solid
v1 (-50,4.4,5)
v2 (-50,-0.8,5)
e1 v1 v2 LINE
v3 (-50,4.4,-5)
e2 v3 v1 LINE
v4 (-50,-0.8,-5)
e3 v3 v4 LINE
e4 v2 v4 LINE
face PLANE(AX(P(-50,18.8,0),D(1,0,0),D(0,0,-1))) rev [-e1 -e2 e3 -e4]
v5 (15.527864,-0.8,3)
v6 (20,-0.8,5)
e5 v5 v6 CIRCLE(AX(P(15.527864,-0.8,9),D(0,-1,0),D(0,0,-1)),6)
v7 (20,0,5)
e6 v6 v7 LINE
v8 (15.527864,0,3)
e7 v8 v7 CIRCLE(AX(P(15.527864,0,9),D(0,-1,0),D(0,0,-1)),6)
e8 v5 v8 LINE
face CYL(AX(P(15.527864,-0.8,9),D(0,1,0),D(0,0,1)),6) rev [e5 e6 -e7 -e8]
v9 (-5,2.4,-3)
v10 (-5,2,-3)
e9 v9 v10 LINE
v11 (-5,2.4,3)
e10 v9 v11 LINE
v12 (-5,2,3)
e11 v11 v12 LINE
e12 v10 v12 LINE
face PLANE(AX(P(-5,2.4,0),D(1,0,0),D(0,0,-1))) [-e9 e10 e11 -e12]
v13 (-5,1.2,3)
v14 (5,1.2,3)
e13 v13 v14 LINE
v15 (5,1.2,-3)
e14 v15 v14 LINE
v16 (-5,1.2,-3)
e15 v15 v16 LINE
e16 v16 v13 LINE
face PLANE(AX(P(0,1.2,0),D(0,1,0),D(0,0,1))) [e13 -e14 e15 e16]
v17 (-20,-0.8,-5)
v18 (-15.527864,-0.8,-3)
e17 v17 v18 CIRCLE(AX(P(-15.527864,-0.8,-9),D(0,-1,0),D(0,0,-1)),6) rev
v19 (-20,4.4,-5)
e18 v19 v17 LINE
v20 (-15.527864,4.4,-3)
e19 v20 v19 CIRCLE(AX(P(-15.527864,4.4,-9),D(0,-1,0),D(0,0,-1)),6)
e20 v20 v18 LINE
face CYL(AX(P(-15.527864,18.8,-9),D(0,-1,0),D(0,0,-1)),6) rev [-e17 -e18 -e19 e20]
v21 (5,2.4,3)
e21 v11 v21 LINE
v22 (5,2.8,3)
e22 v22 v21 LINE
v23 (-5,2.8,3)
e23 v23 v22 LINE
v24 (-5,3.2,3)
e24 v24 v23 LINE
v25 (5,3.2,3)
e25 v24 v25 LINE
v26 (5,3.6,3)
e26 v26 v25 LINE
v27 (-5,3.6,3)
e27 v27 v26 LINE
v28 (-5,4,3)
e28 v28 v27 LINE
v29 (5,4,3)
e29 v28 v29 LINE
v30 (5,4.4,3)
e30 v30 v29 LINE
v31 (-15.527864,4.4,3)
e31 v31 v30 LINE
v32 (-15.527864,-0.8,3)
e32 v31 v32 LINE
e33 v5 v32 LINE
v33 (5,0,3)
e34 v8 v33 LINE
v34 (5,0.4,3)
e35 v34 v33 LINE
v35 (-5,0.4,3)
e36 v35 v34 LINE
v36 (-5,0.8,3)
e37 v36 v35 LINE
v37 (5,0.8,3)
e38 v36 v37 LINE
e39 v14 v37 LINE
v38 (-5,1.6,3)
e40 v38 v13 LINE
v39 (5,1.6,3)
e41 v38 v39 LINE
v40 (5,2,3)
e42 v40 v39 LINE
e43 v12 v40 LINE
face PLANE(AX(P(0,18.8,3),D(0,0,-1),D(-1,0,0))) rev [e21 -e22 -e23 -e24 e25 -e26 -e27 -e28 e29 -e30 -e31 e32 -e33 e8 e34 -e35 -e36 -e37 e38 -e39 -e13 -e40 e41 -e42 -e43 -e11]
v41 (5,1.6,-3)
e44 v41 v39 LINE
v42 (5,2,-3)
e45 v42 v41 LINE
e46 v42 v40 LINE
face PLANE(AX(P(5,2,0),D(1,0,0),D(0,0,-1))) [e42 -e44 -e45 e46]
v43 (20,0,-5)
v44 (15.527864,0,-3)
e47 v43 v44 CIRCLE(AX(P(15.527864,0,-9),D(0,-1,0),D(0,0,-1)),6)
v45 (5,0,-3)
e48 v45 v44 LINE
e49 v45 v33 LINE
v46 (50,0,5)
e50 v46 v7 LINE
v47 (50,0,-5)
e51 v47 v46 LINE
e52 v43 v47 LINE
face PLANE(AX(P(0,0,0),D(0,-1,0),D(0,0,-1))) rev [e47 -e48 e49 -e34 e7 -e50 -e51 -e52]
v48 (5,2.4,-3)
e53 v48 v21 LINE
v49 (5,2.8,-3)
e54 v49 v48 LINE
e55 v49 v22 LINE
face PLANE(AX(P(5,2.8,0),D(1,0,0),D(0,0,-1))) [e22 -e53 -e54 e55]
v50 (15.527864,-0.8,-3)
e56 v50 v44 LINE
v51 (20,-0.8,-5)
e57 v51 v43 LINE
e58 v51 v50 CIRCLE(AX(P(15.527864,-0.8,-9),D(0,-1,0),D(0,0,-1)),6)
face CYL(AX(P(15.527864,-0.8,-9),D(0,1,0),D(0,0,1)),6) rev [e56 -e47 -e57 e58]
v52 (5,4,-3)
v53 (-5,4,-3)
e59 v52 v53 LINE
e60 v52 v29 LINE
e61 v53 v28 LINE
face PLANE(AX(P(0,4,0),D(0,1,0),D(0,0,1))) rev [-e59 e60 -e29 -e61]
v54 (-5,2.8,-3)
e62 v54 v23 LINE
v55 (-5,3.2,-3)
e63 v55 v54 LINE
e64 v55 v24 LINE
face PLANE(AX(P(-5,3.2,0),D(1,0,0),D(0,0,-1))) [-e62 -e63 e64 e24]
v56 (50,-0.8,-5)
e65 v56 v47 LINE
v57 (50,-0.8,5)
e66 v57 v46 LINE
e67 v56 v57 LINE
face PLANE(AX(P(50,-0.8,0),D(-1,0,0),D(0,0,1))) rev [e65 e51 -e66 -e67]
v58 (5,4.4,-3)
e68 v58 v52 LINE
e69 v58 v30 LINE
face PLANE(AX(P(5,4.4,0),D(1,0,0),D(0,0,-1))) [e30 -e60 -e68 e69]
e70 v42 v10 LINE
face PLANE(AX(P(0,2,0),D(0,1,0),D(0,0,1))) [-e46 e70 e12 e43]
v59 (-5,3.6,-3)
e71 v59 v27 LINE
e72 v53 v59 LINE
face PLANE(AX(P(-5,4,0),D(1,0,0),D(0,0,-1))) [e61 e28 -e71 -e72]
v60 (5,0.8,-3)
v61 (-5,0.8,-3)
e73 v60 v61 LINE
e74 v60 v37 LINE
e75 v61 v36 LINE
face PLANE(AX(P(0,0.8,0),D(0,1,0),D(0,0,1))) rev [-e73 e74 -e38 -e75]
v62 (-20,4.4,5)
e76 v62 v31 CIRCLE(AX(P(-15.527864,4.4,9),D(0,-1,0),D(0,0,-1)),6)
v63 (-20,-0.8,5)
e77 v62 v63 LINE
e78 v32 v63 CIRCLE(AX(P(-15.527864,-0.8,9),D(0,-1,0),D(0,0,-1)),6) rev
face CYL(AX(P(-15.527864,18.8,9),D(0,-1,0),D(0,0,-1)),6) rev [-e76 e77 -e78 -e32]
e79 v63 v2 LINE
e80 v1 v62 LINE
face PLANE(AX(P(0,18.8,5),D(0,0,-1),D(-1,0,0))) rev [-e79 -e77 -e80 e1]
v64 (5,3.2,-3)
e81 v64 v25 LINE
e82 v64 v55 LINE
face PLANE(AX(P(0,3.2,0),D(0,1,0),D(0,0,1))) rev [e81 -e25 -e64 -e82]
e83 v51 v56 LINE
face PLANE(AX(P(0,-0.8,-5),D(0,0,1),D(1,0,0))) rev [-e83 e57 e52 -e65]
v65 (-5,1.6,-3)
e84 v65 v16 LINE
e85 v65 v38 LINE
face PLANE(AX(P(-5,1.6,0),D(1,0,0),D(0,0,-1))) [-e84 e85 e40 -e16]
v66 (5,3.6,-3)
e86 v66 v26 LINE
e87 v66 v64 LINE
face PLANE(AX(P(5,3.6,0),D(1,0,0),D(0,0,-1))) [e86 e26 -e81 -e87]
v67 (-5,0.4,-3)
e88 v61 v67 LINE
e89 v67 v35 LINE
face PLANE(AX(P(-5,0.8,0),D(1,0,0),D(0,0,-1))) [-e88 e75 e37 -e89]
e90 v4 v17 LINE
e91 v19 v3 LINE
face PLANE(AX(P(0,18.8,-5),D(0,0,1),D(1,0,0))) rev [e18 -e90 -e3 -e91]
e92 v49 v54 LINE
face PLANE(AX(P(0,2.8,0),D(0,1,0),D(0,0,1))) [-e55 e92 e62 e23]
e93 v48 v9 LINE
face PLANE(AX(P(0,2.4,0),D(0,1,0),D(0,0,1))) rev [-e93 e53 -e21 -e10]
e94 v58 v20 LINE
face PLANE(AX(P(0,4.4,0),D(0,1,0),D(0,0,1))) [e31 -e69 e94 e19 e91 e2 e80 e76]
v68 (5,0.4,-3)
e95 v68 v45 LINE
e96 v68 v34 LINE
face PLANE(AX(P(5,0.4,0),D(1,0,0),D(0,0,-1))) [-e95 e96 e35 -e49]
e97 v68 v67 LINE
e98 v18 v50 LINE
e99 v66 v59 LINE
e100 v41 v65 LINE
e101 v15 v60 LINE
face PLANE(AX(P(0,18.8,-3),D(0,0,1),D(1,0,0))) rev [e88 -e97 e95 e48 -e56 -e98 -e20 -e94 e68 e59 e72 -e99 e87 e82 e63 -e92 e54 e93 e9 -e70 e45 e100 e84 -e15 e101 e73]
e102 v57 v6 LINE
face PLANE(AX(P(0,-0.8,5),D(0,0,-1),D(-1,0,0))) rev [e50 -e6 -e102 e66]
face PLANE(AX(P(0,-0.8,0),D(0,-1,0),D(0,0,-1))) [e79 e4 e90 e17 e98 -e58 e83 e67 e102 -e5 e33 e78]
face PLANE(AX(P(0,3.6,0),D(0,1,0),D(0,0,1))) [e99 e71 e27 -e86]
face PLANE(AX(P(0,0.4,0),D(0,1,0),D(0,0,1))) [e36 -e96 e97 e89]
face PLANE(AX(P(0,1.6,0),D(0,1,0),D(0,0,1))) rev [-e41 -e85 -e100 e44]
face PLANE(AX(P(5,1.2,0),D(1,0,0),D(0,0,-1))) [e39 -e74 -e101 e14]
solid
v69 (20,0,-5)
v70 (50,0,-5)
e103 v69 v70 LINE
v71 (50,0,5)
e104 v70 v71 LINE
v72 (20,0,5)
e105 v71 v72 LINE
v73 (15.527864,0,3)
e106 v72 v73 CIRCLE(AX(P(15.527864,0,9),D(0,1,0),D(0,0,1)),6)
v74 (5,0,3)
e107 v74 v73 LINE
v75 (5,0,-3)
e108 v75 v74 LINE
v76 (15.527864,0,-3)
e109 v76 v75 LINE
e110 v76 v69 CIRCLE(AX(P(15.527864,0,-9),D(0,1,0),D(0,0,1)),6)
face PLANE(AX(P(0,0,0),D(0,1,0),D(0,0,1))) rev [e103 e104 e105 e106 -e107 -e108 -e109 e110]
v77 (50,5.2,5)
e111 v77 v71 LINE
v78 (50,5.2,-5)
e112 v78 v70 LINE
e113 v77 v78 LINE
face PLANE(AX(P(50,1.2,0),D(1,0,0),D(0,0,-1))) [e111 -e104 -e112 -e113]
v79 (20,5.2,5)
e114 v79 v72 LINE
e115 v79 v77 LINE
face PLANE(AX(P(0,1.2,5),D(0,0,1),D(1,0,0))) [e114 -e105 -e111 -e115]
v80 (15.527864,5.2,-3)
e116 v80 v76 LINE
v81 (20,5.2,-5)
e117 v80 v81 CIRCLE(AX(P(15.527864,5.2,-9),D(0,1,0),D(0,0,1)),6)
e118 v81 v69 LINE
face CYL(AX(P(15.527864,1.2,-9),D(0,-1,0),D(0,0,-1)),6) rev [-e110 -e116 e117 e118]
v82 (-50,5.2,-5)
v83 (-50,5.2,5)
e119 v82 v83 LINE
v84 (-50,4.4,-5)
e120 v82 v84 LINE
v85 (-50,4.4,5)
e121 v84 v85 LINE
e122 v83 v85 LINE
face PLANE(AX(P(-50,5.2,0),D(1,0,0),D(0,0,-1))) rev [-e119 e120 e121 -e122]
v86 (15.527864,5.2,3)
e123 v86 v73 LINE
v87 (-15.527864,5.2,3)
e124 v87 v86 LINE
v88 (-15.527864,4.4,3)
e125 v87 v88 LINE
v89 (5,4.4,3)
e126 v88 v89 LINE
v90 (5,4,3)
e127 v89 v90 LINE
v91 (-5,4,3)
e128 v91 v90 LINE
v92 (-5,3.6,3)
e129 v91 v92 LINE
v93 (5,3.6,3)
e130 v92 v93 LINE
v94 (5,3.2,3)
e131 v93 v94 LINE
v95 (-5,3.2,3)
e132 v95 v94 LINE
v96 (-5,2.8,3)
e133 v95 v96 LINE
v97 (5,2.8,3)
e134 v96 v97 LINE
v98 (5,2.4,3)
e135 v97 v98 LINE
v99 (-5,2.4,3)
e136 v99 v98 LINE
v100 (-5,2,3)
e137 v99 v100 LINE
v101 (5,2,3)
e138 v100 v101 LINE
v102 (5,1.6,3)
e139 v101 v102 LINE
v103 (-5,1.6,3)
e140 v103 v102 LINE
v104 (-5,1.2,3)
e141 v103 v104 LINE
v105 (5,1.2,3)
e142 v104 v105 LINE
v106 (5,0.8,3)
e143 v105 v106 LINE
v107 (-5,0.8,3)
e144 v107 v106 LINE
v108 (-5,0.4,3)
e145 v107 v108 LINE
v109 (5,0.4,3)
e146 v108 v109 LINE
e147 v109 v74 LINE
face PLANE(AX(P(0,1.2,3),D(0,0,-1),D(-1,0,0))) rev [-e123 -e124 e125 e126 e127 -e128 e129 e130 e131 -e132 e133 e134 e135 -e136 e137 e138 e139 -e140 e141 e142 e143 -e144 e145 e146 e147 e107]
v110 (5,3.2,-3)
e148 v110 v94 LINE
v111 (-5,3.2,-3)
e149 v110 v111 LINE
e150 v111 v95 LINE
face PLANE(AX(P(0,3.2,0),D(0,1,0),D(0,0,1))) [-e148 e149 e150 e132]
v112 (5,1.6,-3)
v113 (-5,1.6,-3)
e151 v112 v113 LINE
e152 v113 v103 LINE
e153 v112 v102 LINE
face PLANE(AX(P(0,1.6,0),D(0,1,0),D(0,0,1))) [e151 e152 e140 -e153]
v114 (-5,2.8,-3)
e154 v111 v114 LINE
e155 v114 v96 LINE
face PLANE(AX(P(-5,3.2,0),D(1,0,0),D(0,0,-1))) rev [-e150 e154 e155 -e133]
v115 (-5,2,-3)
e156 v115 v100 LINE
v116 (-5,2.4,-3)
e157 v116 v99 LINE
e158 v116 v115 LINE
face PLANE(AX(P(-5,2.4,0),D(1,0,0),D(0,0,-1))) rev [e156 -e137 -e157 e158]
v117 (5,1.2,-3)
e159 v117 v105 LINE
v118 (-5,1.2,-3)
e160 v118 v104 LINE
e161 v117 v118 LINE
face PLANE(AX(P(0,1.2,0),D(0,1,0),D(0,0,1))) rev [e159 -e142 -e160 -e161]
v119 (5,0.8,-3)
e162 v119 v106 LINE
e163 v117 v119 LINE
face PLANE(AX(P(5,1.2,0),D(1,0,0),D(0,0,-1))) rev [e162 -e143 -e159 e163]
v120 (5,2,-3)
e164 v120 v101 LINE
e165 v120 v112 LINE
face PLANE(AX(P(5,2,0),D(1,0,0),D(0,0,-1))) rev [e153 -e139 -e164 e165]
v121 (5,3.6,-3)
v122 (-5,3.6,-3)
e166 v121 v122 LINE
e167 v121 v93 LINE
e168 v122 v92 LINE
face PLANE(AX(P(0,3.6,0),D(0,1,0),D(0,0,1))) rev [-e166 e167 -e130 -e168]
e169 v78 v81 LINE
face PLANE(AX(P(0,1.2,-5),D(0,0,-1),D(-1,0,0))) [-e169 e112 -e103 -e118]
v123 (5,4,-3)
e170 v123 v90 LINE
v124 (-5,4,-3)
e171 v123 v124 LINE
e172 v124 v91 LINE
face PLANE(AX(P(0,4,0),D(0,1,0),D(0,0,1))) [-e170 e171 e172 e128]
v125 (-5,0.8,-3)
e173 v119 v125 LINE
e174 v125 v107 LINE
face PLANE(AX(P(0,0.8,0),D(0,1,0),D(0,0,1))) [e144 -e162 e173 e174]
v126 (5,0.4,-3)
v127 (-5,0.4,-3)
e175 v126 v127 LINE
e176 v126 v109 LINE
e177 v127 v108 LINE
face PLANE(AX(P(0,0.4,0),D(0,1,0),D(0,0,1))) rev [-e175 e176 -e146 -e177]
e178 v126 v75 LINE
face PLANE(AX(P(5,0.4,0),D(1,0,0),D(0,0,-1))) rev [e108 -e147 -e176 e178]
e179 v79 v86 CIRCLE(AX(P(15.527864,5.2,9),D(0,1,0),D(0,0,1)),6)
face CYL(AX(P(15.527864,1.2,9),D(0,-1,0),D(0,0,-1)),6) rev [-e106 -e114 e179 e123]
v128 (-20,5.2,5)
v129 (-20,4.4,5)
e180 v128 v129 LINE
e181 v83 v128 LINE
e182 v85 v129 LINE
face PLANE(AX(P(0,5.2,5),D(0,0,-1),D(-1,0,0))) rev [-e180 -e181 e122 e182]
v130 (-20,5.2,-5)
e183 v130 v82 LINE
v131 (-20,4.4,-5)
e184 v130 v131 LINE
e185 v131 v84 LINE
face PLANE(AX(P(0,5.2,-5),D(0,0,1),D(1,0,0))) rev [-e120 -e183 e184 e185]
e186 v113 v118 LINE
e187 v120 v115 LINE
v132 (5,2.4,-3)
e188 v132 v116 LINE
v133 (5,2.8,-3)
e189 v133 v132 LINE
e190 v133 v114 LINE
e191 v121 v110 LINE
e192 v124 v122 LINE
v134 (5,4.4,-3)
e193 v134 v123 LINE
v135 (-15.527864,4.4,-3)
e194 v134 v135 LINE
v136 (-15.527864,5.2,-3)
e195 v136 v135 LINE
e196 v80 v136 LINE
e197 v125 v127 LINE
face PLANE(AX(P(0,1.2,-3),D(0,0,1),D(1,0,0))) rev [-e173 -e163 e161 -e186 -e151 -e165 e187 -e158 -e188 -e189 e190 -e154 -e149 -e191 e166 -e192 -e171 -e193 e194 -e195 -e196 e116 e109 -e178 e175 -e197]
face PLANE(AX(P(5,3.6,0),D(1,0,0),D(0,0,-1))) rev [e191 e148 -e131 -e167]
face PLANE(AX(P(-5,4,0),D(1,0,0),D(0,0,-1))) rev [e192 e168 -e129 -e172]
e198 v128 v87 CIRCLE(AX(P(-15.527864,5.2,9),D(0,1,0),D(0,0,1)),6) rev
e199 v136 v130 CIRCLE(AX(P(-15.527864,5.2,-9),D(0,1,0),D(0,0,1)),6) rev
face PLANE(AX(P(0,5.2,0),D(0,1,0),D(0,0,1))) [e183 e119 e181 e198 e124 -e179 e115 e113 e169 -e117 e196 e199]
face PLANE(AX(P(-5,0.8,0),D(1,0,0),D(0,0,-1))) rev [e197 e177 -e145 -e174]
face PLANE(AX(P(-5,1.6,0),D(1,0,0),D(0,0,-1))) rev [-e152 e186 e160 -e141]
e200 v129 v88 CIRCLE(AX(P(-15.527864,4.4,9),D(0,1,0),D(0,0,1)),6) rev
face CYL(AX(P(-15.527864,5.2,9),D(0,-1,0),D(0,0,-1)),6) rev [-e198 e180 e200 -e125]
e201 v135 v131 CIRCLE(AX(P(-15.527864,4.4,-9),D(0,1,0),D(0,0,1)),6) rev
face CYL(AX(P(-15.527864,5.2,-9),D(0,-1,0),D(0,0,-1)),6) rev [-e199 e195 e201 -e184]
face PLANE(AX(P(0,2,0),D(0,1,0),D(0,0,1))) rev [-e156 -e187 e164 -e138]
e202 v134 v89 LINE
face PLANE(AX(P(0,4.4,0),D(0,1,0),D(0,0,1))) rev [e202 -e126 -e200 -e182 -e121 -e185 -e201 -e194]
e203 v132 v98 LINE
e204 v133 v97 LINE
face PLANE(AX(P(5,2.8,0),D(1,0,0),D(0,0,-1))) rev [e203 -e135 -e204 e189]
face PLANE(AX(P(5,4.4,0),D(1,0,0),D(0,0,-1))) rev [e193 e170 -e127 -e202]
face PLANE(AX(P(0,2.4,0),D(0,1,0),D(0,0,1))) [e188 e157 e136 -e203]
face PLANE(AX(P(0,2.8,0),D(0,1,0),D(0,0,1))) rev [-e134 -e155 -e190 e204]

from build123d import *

# Parameters (mm, degrees)
SKETCH1_W            = 5
SKETCH1_H            = 6
BOSS_EXTRUDE7_DEPTH  = 0.4
BOSS_EXTRUDE8_DEPTH  = 0.4
SKETCH4_W            = 5
SKETCH4_H            = 6
BOSS_EXTRUDE9_DEPTH  = 0.4
BOSS_EXTRUDE10_DEPTH = 0.4
LPATTERN2_COUNT      = 25
LPATTERN2_PITCH      = 0.8
LPATTERN3_COUNT      = 25
LPATTERN3_PITCH      = 0.8
BOSS_EXTRUDE11_DEPTH = 0.8
CUT_EXTRUDE1_DEPTH   = 15.6
BOSS_EXTRUDE12_DEPTH = 0.8


with BuildPart() as part:
    # Sketch1 → Boss-Extrude7 (new body)
    with BuildSketch(Plane(origin=(0, 0, 0), x_dir=(1, 0, 0), z_dir=(0, 1, 0))):
        with BuildLine():
            Line((-5, -3), (-5, 3))
            Line((-5, 3), (-15.527864045, 3))
            ThreePointArc((-15.527864045, 3), (-17.977353788, 3.522774425), (-20, 5))
            Line((-20, 5), (-50, 5))
            Line((-50, 5), (-50, -5))
            Line((-50, -5), (-20, -5))
            ThreePointArc((-20, -5), (-17.977353788, -3.522774425), (-15.527864045, -3))
            Line((-15.527864045, -3), (-5, -3))
        make_face()
        with Locations((-2.5, 0)):
            Rectangle(SKETCH1_W, SKETCH1_H)
        with Locations((2.5, 0)):
            Rectangle(SKETCH1_W, SKETCH1_H)
    extrude(amount=BOSS_EXTRUDE7_DEPTH)

    # Sketch4<3> → Boss-Extrude10 (add)
    with BuildSketch(Plane(origin=(0, 0.4, 0), x_dir=(1, 0, 0), z_dir=(0, 1, 0))):
        with BuildLine():
            Line((-5, -3), (-5, 3))
            Line((-5, 3), (-15.527864045, 3))
            ThreePointArc((-15.527864045, 3), (-17.977353788, 3.522774425), (-20, 5))
            Line((-20, 5), (-50, 5))
            Line((-50, 5), (-50, -5))
            Line((-50, -5), (-20, -5))
            ThreePointArc((-20, -5), (-17.977353788, -3.522774425), (-15.527864045, -3))
            Line((-15.527864045, -3), (-5, -3))
        make_face()
    extrude(amount=BOSS_EXTRUDE10_DEPTH)


with BuildPart() as body_2:
    # Sketch1<3> → Boss-Extrude8 (new body)
    with BuildSketch(Plane(origin=(0, 0, 0), x_dir=(1, 0, 0), z_dir=(0, 1, 0))):
        with BuildLine():
            ThreePointArc((20, 5), (17.977353788, 3.522774425), (15.527864045, 3))
            Line((15.527864045, 3), (5, 3))
            Line((5, 3), (5, -3))
            Line((5, -3), (15.527864045, -3))
            ThreePointArc((15.527864045, -3), (17.977353788, -3.522774425), (20, -5))
            Line((20, -5), (50, -5))
            Line((50, -5), (50, 5))
            Line((50, 5), (20, 5))
        make_face()
    extrude(amount=BOSS_EXTRUDE8_DEPTH)

    # Sketch4 → Boss-Extrude9 (add)
    with BuildSketch(Plane(origin=(0, 0.4, 0), x_dir=(1, 0, 0), z_dir=(0, 1, 0))):
        with BuildLine():
            ThreePointArc((20, -5), (17.977353788, -3.522774425), (15.527864045, -3))
            Line((15.527864045, -3), (5, -3))
            Line((5, -3), (5, 3))
            Line((5, 3), (15.527864045, 3))
            ThreePointArc((15.527864045, 3), (17.977353788, 3.522774425), (20, 5))
            Line((20, 5), (50, 5))
            Line((50, 5), (50, -5))
            Line((50, -5), (20, -5))
        make_face()
        with Locations((2.5, 0)):
            Rectangle(SKETCH4_W, SKETCH4_H)
        with Locations((-2.5, 0)):
            Rectangle(SKETCH4_W, SKETCH4_H)
    extrude(amount=BOSS_EXTRUDE9_DEPTH)


with BuildPart() as lpattern2_1:
    # LPattern2: pattern copy
    add(part.part.moved(Location(Vector(0, 1, 0) * (1 * LPATTERN2_PITCH))))


with BuildPart() as lpattern2_2:
    # LPattern2: pattern copy
    add(part.part.moved(Location(Vector(0, 1, 0) * (2 * LPATTERN2_PITCH))))


with BuildPart() as lpattern2_3:
    # LPattern2: pattern copy
    add(part.part.moved(Location(Vector(0, 1, 0) * (3 * LPATTERN2_PITCH))))


with BuildPart() as lpattern2_4:
    # LPattern2: pattern copy
    add(part.part.moved(Location(Vector(0, 1, 0) * (4 * LPATTERN2_PITCH))))


with BuildPart() as lpattern2_5:
    # LPattern2: pattern copy
    add(part.part.moved(Location(Vector(0, 1, 0) * (5 * LPATTERN2_PITCH))))


with BuildPart() as lpattern2_6:
    # LPattern2: pattern copy
    add(part.part.moved(Location(Vector(0, 1, 0) * (6 * LPATTERN2_PITCH))))


with BuildPart() as lpattern2_7:
    # LPattern2: pattern copy
    add(part.part.moved(Location(Vector(0, 1, 0) * (7 * LPATTERN2_PITCH))))


with BuildPart() as lpattern2_8:
    # LPattern2: pattern copy
    add(part.part.moved(Location(Vector(0, 1, 0) * (8 * LPATTERN2_PITCH))))


with BuildPart() as lpattern2_9:
    # LPattern2: pattern copy
    add(part.part.moved(Location(Vector(0, 1, 0) * (9 * LPATTERN2_PITCH))))


with BuildPart() as lpattern2_10:
    # LPattern2: pattern copy
    add(part.part.moved(Location(Vector(0, 1, 0) * (10 * LPATTERN2_PITCH))))


with BuildPart() as lpattern2_11:
    # LPattern2: pattern copy
    add(part.part.moved(Location(Vector(0, 1, 0) * (11 * LPATTERN2_PITCH))))


with BuildPart() as lpattern2_12:
    # LPattern2: pattern copy
    add(part.part.moved(Location(Vector(0, 1, 0) * (12 * LPATTERN2_PITCH))))


with BuildPart() as lpattern2_13:
    # LPattern2: pattern copy
    add(part.part.moved(Location(Vector(0, 1, 0) * (13 * LPATTERN2_PITCH))))


with BuildPart() as lpattern2_14:
    # LPattern2: pattern copy
    add(part.part.moved(Location(Vector(0, 1, 0) * (14 * LPATTERN2_PITCH))))


with BuildPart() as lpattern2_15:
    # LPattern2: pattern copy
    add(part.part.moved(Location(Vector(0, 1, 0) * (15 * LPATTERN2_PITCH))))


with BuildPart() as lpattern2_16:
    # LPattern2: pattern copy
    add(part.part.moved(Location(Vector(0, 1, 0) * (16 * LPATTERN2_PITCH))))


with BuildPart() as lpattern2_17:
    # LPattern2: pattern copy
    add(part.part.moved(Location(Vector(0, 1, 0) * (17 * LPATTERN2_PITCH))))


with BuildPart() as lpattern2_18:
    # LPattern2: pattern copy
    add(part.part.moved(Location(Vector(0, 1, 0) * (18 * LPATTERN2_PITCH))))


with BuildPart() as lpattern2_19:
    # LPattern2: pattern copy
    add(part.part.moved(Location(Vector(0, 1, 0) * (19 * LPATTERN2_PITCH))))


with BuildPart() as lpattern2_20:
    # LPattern2: pattern copy
    add(part.part.moved(Location(Vector(0, 1, 0) * (20 * LPATTERN2_PITCH))))


with BuildPart() as lpattern2_21:
    # LPattern2: pattern copy
    add(part.part.moved(Location(Vector(0, 1, 0) * (21 * LPATTERN2_PITCH))))


with BuildPart() as lpattern2_22:
    # LPattern2: pattern copy
    add(part.part.moved(Location(Vector(0, 1, 0) * (22 * LPATTERN2_PITCH))))


with BuildPart() as lpattern2_23:
    # LPattern2: pattern copy
    add(part.part.moved(Location(Vector(0, 1, 0) * (23 * LPATTERN2_PITCH))))


with BuildPart() as lpattern2_24:
    # LPattern2: pattern copy
    add(part.part.moved(Location(Vector(0, 1, 0) * (24 * LPATTERN2_PITCH))))


with BuildPart() as lpattern2_23_1:
    add(lpattern2_23.part)

    # Combine1: union LPattern2_22, LPattern2_21, LPattern2_20, LPattern2_19, LPattern2_18, LPattern2_17, LPattern2_16, LPattern2_15, LPattern2_14, LPattern2_13, LPattern2_12, LPattern2_11, LPattern2_10, LPattern2_9, LPattern2_8, LPattern2_7, LPattern2_6, LPattern2_5, LPattern2_4, LPattern2_3, LPattern2_2, LPattern2_1, part, LPattern2_24
    add(lpattern2_22.part)
    add(lpattern2_21.part)
    add(lpattern2_20.part)
    add(lpattern2_19.part)
    add(lpattern2_18.part)
    add(lpattern2_17.part)
    add(lpattern2_16.part)
    add(lpattern2_15.part)
    add(lpattern2_14.part)
    add(lpattern2_13.part)
    add(lpattern2_12.part)
    add(lpattern2_11.part)
    add(lpattern2_10.part)
    add(lpattern2_9.part)
    add(lpattern2_8.part)
    add(lpattern2_7.part)
    add(lpattern2_6.part)
    add(lpattern2_5.part)
    add(lpattern2_4.part)
    add(lpattern2_3.part)
    add(lpattern2_2.part)
    add(lpattern2_1.part)
    add(part.part)
    add(lpattern2_24.part)

    # Sketch5 → Boss-Extrude11 (add)
    with BuildSketch(Plane.XZ):
        with BuildLine():
            ThreePointArc((-20, -5), (-17.977353788, -3.522774425), (-15.527864045, -3))
            Line((-15.527864045, -3), (5, -3))
            Line((5, -3), (5, 3))
            Line((5, 3), (-15.527864045, 3))
            ThreePointArc((-15.527864045, 3), (-17.977353788, 3.522774425), (-20, 5))
            Line((-20, 5), (-50, 5))
            Line((-50, 5), (-50, -5))
            Line((-50, -5), (-20, -5))
        make_face()
        with BuildLine():
            ThreePointArc((15.527864045, 3), (17.977353788, 3.522774425), (20, 5))
            Line((20, 5), (50, 5))
            Line((50, 5), (50, -5))
            Line((50, -5), (20, -5))
            ThreePointArc((20, -5), (17.977353788, -3.522774425), (15.527864045, -3))
            Line((15.527864045, -3), (5, -3))
            Line((5, -3), (5, 3))
            Line((5, 3), (15.527864045, 3))
        make_face()
    extrude(amount=BOSS_EXTRUDE11_DEPTH)


with BuildPart() as lpattern3_1:
    # LPattern3: pattern copy
    add(body_2.part.moved(Location(Vector(0, 1, 0) * (1 * LPATTERN3_PITCH))))


with BuildPart() as lpattern3_2:
    # LPattern3: pattern copy
    add(body_2.part.moved(Location(Vector(0, 1, 0) * (2 * LPATTERN3_PITCH))))


with BuildPart() as lpattern3_3:
    # LPattern3: pattern copy
    add(body_2.part.moved(Location(Vector(0, 1, 0) * (3 * LPATTERN3_PITCH))))


with BuildPart() as lpattern3_4:
    # LPattern3: pattern copy
    add(body_2.part.moved(Location(Vector(0, 1, 0) * (4 * LPATTERN3_PITCH))))


with BuildPart() as lpattern3_5:
    # LPattern3: pattern copy
    add(body_2.part.moved(Location(Vector(0, 1, 0) * (5 * LPATTERN3_PITCH))))


with BuildPart() as lpattern3_6:
    # LPattern3: pattern copy
    add(body_2.part.moved(Location(Vector(0, 1, 0) * (6 * LPATTERN3_PITCH))))


with BuildPart() as lpattern3_7:
    # LPattern3: pattern copy
    add(body_2.part.moved(Location(Vector(0, 1, 0) * (7 * LPATTERN3_PITCH))))


with BuildPart() as lpattern3_8:
    # LPattern3: pattern copy
    add(body_2.part.moved(Location(Vector(0, 1, 0) * (8 * LPATTERN3_PITCH))))


with BuildPart() as lpattern3_9:
    # LPattern3: pattern copy
    add(body_2.part.moved(Location(Vector(0, 1, 0) * (9 * LPATTERN3_PITCH))))


with BuildPart() as lpattern3_10:
    # LPattern3: pattern copy
    add(body_2.part.moved(Location(Vector(0, 1, 0) * (10 * LPATTERN3_PITCH))))


with BuildPart() as lpattern3_11:
    # LPattern3: pattern copy
    add(body_2.part.moved(Location(Vector(0, 1, 0) * (11 * LPATTERN3_PITCH))))


with BuildPart() as lpattern3_12:
    # LPattern3: pattern copy
    add(body_2.part.moved(Location(Vector(0, 1, 0) * (12 * LPATTERN3_PITCH))))


with BuildPart() as lpattern3_13:
    # LPattern3: pattern copy
    add(body_2.part.moved(Location(Vector(0, 1, 0) * (13 * LPATTERN3_PITCH))))


with BuildPart() as lpattern3_14:
    # LPattern3: pattern copy
    add(body_2.part.moved(Location(Vector(0, 1, 0) * (14 * LPATTERN3_PITCH))))


with BuildPart() as lpattern3_15:
    # LPattern3: pattern copy
    add(body_2.part.moved(Location(Vector(0, 1, 0) * (15 * LPATTERN3_PITCH))))


with BuildPart() as lpattern3_16:
    # LPattern3: pattern copy
    add(body_2.part.moved(Location(Vector(0, 1, 0) * (16 * LPATTERN3_PITCH))))


with BuildPart() as lpattern3_17:
    # LPattern3: pattern copy
    add(body_2.part.moved(Location(Vector(0, 1, 0) * (17 * LPATTERN3_PITCH))))


with BuildPart() as lpattern3_18:
    # LPattern3: pattern copy
    add(body_2.part.moved(Location(Vector(0, 1, 0) * (18 * LPATTERN3_PITCH))))


with BuildPart() as lpattern3_19:
    # LPattern3: pattern copy
    add(body_2.part.moved(Location(Vector(0, 1, 0) * (19 * LPATTERN3_PITCH))))


with BuildPart() as lpattern3_20:
    # LPattern3: pattern copy
    add(body_2.part.moved(Location(Vector(0, 1, 0) * (20 * LPATTERN3_PITCH))))


with BuildPart() as lpattern3_21:
    # LPattern3: pattern copy
    add(body_2.part.moved(Location(Vector(0, 1, 0) * (21 * LPATTERN3_PITCH))))


with BuildPart() as lpattern3_22:
    # LPattern3: pattern copy
    add(body_2.part.moved(Location(Vector(0, 1, 0) * (22 * LPATTERN3_PITCH))))


with BuildPart() as lpattern3_23:
    # LPattern3: pattern copy
    add(body_2.part.moved(Location(Vector(0, 1, 0) * (23 * LPATTERN3_PITCH))))


with BuildPart() as lpattern3_24:
    # LPattern3: pattern copy
    add(body_2.part.moved(Location(Vector(0, 1, 0) * (24 * LPATTERN3_PITCH))))


with BuildPart() as lpattern3_20_1:
    add(lpattern3_20.part)

    # Combine3: read off the stored shape, not the designer's step
    # Combine3: union body 2, LPattern3_2, LPattern3_3, LPattern3_4, LPattern3_5, LPattern3_6, LPattern3_7, LPattern3_8, LPattern3_9, LPattern3_10, LPattern3_11, LPattern3_12, LPattern3_13, LPattern3_14, LPattern3_15, LPattern3_16, LPattern3_17, LPattern3_18, LPattern3_19, LPattern3_21, LPattern3_22, LPattern3_23, LPattern3_24, LPattern3_1
    add(body_2.part)
    add(lpattern3_2.part)
    add(lpattern3_3.part)
    add(lpattern3_4.part)
    add(lpattern3_5.part)
    add(lpattern3_6.part)
    add(lpattern3_7.part)
    add(lpattern3_8.part)
    add(lpattern3_9.part)
    add(lpattern3_10.part)
    add(lpattern3_11.part)
    add(lpattern3_12.part)
    add(lpattern3_13.part)
    add(lpattern3_14.part)
    add(lpattern3_15.part)
    add(lpattern3_16.part)
    add(lpattern3_17.part)
    add(lpattern3_18.part)
    add(lpattern3_19.part)
    add(lpattern3_21.part)
    add(lpattern3_22.part)
    add(lpattern3_23.part)
    add(lpattern3_24.part)
    add(lpattern3_1.part)


with BuildPart() as cut_extrude1_tool:
    # Sketch6 → Cut-Extrude1 (new body)
    with BuildSketch(Plane(origin=(0, 20, 0), x_dir=(1, 0, 0), z_dir=(0, 1, 0))):
        with BuildLine():
            Line((-15.527864045, -3), (-5, -3))
            Line((-5, -3), (-5, 3))
            Line((-5, 3), (-15.527864045, 3))
            ThreePointArc((-15.527864045, 3), (-17.977353788, 3.522774425), (-20, 5))
            Line((-20, 5), (-50, 5))
            Line((-50, 5), (-50, -5))
            Line((-50, -5), (-20, -5))
            ThreePointArc((-20, -5), (-17.977353788, -3.522774425), (-15.527864045, -3))
        make_face()
        with BuildLine():
            ThreePointArc((15.527864045, 3), (17.977353788, 3.522774425), (20, 5))
            Line((20, 5), (50, 5))
            Line((50, 5), (50, -5))
            Line((50, -5), (20, -5))
            ThreePointArc((20, -5), (17.977353788, -3.522774425), (15.527864045, -3))
            Line((15.527864045, -3), (-5, -3))
            Line((-5, -3), (-5, 3))
            Line((-5, 3), (15.527864045, 3))
        make_face()
    extrude(amount=-CUT_EXTRUDE1_DEPTH)


with BuildPart() as lpattern2_23_2:
    add(lpattern2_23_1.part)

    # Cut-Extrude1: cut by cut_extrude1_tool
    add(cut_extrude1_tool.part, mode=Mode.SUBTRACT)


with BuildPart() as lpattern3_20_2:
    add(lpattern3_20_1.part)

    # Cut-Extrude1: cut by cut_extrude1_tool
    add(cut_extrude1_tool.part, mode=Mode.SUBTRACT)

    # Sketch7 → Boss-Extrude12 (add)
    with BuildSketch(Plane(origin=(0, 4.4, 0), x_dir=(1, 0, 0), z_dir=(0, 1, 0))):
        with BuildLine():
            ThreePointArc((15.527864045, 3), (17.977353788, 3.522774425), (20, 5))
            Line((20, 5), (50, 5))
            Line((50, 5), (50, -5))
            Line((50, -5), (20, -5))
            ThreePointArc((20, -5), (17.977353788, -3.522774425), (15.527864045, -3))
            Line((15.527864045, -3), (5, -3))
            Line((5, -3), (5, 3))
            Line((5, 3), (15.527864045, 3))
        make_face()
        with BuildLine():
            Line((5, -3), (5, 3))
            Line((5, 3), (-15.527864045, 3))
            ThreePointArc((-15.527864045, 3), (-17.977353788, 3.522774425), (-20, 5))
            Line((-20, 5), (-50, 5))
            Line((-50, 5), (-50, -5))
            Line((-50, -5), (-20, -5))
            ThreePointArc((-20, -5), (-17.977353788, -3.522774425), (-15.527864045, -3))
            Line((-15.527864045, -3), (5, -3))
        make_face()
    extrude(amount=BOSS_EXTRUDE12_DEPTH)


solid = Compound([lpattern2_23_2.part, lpattern3_20_2.part])
